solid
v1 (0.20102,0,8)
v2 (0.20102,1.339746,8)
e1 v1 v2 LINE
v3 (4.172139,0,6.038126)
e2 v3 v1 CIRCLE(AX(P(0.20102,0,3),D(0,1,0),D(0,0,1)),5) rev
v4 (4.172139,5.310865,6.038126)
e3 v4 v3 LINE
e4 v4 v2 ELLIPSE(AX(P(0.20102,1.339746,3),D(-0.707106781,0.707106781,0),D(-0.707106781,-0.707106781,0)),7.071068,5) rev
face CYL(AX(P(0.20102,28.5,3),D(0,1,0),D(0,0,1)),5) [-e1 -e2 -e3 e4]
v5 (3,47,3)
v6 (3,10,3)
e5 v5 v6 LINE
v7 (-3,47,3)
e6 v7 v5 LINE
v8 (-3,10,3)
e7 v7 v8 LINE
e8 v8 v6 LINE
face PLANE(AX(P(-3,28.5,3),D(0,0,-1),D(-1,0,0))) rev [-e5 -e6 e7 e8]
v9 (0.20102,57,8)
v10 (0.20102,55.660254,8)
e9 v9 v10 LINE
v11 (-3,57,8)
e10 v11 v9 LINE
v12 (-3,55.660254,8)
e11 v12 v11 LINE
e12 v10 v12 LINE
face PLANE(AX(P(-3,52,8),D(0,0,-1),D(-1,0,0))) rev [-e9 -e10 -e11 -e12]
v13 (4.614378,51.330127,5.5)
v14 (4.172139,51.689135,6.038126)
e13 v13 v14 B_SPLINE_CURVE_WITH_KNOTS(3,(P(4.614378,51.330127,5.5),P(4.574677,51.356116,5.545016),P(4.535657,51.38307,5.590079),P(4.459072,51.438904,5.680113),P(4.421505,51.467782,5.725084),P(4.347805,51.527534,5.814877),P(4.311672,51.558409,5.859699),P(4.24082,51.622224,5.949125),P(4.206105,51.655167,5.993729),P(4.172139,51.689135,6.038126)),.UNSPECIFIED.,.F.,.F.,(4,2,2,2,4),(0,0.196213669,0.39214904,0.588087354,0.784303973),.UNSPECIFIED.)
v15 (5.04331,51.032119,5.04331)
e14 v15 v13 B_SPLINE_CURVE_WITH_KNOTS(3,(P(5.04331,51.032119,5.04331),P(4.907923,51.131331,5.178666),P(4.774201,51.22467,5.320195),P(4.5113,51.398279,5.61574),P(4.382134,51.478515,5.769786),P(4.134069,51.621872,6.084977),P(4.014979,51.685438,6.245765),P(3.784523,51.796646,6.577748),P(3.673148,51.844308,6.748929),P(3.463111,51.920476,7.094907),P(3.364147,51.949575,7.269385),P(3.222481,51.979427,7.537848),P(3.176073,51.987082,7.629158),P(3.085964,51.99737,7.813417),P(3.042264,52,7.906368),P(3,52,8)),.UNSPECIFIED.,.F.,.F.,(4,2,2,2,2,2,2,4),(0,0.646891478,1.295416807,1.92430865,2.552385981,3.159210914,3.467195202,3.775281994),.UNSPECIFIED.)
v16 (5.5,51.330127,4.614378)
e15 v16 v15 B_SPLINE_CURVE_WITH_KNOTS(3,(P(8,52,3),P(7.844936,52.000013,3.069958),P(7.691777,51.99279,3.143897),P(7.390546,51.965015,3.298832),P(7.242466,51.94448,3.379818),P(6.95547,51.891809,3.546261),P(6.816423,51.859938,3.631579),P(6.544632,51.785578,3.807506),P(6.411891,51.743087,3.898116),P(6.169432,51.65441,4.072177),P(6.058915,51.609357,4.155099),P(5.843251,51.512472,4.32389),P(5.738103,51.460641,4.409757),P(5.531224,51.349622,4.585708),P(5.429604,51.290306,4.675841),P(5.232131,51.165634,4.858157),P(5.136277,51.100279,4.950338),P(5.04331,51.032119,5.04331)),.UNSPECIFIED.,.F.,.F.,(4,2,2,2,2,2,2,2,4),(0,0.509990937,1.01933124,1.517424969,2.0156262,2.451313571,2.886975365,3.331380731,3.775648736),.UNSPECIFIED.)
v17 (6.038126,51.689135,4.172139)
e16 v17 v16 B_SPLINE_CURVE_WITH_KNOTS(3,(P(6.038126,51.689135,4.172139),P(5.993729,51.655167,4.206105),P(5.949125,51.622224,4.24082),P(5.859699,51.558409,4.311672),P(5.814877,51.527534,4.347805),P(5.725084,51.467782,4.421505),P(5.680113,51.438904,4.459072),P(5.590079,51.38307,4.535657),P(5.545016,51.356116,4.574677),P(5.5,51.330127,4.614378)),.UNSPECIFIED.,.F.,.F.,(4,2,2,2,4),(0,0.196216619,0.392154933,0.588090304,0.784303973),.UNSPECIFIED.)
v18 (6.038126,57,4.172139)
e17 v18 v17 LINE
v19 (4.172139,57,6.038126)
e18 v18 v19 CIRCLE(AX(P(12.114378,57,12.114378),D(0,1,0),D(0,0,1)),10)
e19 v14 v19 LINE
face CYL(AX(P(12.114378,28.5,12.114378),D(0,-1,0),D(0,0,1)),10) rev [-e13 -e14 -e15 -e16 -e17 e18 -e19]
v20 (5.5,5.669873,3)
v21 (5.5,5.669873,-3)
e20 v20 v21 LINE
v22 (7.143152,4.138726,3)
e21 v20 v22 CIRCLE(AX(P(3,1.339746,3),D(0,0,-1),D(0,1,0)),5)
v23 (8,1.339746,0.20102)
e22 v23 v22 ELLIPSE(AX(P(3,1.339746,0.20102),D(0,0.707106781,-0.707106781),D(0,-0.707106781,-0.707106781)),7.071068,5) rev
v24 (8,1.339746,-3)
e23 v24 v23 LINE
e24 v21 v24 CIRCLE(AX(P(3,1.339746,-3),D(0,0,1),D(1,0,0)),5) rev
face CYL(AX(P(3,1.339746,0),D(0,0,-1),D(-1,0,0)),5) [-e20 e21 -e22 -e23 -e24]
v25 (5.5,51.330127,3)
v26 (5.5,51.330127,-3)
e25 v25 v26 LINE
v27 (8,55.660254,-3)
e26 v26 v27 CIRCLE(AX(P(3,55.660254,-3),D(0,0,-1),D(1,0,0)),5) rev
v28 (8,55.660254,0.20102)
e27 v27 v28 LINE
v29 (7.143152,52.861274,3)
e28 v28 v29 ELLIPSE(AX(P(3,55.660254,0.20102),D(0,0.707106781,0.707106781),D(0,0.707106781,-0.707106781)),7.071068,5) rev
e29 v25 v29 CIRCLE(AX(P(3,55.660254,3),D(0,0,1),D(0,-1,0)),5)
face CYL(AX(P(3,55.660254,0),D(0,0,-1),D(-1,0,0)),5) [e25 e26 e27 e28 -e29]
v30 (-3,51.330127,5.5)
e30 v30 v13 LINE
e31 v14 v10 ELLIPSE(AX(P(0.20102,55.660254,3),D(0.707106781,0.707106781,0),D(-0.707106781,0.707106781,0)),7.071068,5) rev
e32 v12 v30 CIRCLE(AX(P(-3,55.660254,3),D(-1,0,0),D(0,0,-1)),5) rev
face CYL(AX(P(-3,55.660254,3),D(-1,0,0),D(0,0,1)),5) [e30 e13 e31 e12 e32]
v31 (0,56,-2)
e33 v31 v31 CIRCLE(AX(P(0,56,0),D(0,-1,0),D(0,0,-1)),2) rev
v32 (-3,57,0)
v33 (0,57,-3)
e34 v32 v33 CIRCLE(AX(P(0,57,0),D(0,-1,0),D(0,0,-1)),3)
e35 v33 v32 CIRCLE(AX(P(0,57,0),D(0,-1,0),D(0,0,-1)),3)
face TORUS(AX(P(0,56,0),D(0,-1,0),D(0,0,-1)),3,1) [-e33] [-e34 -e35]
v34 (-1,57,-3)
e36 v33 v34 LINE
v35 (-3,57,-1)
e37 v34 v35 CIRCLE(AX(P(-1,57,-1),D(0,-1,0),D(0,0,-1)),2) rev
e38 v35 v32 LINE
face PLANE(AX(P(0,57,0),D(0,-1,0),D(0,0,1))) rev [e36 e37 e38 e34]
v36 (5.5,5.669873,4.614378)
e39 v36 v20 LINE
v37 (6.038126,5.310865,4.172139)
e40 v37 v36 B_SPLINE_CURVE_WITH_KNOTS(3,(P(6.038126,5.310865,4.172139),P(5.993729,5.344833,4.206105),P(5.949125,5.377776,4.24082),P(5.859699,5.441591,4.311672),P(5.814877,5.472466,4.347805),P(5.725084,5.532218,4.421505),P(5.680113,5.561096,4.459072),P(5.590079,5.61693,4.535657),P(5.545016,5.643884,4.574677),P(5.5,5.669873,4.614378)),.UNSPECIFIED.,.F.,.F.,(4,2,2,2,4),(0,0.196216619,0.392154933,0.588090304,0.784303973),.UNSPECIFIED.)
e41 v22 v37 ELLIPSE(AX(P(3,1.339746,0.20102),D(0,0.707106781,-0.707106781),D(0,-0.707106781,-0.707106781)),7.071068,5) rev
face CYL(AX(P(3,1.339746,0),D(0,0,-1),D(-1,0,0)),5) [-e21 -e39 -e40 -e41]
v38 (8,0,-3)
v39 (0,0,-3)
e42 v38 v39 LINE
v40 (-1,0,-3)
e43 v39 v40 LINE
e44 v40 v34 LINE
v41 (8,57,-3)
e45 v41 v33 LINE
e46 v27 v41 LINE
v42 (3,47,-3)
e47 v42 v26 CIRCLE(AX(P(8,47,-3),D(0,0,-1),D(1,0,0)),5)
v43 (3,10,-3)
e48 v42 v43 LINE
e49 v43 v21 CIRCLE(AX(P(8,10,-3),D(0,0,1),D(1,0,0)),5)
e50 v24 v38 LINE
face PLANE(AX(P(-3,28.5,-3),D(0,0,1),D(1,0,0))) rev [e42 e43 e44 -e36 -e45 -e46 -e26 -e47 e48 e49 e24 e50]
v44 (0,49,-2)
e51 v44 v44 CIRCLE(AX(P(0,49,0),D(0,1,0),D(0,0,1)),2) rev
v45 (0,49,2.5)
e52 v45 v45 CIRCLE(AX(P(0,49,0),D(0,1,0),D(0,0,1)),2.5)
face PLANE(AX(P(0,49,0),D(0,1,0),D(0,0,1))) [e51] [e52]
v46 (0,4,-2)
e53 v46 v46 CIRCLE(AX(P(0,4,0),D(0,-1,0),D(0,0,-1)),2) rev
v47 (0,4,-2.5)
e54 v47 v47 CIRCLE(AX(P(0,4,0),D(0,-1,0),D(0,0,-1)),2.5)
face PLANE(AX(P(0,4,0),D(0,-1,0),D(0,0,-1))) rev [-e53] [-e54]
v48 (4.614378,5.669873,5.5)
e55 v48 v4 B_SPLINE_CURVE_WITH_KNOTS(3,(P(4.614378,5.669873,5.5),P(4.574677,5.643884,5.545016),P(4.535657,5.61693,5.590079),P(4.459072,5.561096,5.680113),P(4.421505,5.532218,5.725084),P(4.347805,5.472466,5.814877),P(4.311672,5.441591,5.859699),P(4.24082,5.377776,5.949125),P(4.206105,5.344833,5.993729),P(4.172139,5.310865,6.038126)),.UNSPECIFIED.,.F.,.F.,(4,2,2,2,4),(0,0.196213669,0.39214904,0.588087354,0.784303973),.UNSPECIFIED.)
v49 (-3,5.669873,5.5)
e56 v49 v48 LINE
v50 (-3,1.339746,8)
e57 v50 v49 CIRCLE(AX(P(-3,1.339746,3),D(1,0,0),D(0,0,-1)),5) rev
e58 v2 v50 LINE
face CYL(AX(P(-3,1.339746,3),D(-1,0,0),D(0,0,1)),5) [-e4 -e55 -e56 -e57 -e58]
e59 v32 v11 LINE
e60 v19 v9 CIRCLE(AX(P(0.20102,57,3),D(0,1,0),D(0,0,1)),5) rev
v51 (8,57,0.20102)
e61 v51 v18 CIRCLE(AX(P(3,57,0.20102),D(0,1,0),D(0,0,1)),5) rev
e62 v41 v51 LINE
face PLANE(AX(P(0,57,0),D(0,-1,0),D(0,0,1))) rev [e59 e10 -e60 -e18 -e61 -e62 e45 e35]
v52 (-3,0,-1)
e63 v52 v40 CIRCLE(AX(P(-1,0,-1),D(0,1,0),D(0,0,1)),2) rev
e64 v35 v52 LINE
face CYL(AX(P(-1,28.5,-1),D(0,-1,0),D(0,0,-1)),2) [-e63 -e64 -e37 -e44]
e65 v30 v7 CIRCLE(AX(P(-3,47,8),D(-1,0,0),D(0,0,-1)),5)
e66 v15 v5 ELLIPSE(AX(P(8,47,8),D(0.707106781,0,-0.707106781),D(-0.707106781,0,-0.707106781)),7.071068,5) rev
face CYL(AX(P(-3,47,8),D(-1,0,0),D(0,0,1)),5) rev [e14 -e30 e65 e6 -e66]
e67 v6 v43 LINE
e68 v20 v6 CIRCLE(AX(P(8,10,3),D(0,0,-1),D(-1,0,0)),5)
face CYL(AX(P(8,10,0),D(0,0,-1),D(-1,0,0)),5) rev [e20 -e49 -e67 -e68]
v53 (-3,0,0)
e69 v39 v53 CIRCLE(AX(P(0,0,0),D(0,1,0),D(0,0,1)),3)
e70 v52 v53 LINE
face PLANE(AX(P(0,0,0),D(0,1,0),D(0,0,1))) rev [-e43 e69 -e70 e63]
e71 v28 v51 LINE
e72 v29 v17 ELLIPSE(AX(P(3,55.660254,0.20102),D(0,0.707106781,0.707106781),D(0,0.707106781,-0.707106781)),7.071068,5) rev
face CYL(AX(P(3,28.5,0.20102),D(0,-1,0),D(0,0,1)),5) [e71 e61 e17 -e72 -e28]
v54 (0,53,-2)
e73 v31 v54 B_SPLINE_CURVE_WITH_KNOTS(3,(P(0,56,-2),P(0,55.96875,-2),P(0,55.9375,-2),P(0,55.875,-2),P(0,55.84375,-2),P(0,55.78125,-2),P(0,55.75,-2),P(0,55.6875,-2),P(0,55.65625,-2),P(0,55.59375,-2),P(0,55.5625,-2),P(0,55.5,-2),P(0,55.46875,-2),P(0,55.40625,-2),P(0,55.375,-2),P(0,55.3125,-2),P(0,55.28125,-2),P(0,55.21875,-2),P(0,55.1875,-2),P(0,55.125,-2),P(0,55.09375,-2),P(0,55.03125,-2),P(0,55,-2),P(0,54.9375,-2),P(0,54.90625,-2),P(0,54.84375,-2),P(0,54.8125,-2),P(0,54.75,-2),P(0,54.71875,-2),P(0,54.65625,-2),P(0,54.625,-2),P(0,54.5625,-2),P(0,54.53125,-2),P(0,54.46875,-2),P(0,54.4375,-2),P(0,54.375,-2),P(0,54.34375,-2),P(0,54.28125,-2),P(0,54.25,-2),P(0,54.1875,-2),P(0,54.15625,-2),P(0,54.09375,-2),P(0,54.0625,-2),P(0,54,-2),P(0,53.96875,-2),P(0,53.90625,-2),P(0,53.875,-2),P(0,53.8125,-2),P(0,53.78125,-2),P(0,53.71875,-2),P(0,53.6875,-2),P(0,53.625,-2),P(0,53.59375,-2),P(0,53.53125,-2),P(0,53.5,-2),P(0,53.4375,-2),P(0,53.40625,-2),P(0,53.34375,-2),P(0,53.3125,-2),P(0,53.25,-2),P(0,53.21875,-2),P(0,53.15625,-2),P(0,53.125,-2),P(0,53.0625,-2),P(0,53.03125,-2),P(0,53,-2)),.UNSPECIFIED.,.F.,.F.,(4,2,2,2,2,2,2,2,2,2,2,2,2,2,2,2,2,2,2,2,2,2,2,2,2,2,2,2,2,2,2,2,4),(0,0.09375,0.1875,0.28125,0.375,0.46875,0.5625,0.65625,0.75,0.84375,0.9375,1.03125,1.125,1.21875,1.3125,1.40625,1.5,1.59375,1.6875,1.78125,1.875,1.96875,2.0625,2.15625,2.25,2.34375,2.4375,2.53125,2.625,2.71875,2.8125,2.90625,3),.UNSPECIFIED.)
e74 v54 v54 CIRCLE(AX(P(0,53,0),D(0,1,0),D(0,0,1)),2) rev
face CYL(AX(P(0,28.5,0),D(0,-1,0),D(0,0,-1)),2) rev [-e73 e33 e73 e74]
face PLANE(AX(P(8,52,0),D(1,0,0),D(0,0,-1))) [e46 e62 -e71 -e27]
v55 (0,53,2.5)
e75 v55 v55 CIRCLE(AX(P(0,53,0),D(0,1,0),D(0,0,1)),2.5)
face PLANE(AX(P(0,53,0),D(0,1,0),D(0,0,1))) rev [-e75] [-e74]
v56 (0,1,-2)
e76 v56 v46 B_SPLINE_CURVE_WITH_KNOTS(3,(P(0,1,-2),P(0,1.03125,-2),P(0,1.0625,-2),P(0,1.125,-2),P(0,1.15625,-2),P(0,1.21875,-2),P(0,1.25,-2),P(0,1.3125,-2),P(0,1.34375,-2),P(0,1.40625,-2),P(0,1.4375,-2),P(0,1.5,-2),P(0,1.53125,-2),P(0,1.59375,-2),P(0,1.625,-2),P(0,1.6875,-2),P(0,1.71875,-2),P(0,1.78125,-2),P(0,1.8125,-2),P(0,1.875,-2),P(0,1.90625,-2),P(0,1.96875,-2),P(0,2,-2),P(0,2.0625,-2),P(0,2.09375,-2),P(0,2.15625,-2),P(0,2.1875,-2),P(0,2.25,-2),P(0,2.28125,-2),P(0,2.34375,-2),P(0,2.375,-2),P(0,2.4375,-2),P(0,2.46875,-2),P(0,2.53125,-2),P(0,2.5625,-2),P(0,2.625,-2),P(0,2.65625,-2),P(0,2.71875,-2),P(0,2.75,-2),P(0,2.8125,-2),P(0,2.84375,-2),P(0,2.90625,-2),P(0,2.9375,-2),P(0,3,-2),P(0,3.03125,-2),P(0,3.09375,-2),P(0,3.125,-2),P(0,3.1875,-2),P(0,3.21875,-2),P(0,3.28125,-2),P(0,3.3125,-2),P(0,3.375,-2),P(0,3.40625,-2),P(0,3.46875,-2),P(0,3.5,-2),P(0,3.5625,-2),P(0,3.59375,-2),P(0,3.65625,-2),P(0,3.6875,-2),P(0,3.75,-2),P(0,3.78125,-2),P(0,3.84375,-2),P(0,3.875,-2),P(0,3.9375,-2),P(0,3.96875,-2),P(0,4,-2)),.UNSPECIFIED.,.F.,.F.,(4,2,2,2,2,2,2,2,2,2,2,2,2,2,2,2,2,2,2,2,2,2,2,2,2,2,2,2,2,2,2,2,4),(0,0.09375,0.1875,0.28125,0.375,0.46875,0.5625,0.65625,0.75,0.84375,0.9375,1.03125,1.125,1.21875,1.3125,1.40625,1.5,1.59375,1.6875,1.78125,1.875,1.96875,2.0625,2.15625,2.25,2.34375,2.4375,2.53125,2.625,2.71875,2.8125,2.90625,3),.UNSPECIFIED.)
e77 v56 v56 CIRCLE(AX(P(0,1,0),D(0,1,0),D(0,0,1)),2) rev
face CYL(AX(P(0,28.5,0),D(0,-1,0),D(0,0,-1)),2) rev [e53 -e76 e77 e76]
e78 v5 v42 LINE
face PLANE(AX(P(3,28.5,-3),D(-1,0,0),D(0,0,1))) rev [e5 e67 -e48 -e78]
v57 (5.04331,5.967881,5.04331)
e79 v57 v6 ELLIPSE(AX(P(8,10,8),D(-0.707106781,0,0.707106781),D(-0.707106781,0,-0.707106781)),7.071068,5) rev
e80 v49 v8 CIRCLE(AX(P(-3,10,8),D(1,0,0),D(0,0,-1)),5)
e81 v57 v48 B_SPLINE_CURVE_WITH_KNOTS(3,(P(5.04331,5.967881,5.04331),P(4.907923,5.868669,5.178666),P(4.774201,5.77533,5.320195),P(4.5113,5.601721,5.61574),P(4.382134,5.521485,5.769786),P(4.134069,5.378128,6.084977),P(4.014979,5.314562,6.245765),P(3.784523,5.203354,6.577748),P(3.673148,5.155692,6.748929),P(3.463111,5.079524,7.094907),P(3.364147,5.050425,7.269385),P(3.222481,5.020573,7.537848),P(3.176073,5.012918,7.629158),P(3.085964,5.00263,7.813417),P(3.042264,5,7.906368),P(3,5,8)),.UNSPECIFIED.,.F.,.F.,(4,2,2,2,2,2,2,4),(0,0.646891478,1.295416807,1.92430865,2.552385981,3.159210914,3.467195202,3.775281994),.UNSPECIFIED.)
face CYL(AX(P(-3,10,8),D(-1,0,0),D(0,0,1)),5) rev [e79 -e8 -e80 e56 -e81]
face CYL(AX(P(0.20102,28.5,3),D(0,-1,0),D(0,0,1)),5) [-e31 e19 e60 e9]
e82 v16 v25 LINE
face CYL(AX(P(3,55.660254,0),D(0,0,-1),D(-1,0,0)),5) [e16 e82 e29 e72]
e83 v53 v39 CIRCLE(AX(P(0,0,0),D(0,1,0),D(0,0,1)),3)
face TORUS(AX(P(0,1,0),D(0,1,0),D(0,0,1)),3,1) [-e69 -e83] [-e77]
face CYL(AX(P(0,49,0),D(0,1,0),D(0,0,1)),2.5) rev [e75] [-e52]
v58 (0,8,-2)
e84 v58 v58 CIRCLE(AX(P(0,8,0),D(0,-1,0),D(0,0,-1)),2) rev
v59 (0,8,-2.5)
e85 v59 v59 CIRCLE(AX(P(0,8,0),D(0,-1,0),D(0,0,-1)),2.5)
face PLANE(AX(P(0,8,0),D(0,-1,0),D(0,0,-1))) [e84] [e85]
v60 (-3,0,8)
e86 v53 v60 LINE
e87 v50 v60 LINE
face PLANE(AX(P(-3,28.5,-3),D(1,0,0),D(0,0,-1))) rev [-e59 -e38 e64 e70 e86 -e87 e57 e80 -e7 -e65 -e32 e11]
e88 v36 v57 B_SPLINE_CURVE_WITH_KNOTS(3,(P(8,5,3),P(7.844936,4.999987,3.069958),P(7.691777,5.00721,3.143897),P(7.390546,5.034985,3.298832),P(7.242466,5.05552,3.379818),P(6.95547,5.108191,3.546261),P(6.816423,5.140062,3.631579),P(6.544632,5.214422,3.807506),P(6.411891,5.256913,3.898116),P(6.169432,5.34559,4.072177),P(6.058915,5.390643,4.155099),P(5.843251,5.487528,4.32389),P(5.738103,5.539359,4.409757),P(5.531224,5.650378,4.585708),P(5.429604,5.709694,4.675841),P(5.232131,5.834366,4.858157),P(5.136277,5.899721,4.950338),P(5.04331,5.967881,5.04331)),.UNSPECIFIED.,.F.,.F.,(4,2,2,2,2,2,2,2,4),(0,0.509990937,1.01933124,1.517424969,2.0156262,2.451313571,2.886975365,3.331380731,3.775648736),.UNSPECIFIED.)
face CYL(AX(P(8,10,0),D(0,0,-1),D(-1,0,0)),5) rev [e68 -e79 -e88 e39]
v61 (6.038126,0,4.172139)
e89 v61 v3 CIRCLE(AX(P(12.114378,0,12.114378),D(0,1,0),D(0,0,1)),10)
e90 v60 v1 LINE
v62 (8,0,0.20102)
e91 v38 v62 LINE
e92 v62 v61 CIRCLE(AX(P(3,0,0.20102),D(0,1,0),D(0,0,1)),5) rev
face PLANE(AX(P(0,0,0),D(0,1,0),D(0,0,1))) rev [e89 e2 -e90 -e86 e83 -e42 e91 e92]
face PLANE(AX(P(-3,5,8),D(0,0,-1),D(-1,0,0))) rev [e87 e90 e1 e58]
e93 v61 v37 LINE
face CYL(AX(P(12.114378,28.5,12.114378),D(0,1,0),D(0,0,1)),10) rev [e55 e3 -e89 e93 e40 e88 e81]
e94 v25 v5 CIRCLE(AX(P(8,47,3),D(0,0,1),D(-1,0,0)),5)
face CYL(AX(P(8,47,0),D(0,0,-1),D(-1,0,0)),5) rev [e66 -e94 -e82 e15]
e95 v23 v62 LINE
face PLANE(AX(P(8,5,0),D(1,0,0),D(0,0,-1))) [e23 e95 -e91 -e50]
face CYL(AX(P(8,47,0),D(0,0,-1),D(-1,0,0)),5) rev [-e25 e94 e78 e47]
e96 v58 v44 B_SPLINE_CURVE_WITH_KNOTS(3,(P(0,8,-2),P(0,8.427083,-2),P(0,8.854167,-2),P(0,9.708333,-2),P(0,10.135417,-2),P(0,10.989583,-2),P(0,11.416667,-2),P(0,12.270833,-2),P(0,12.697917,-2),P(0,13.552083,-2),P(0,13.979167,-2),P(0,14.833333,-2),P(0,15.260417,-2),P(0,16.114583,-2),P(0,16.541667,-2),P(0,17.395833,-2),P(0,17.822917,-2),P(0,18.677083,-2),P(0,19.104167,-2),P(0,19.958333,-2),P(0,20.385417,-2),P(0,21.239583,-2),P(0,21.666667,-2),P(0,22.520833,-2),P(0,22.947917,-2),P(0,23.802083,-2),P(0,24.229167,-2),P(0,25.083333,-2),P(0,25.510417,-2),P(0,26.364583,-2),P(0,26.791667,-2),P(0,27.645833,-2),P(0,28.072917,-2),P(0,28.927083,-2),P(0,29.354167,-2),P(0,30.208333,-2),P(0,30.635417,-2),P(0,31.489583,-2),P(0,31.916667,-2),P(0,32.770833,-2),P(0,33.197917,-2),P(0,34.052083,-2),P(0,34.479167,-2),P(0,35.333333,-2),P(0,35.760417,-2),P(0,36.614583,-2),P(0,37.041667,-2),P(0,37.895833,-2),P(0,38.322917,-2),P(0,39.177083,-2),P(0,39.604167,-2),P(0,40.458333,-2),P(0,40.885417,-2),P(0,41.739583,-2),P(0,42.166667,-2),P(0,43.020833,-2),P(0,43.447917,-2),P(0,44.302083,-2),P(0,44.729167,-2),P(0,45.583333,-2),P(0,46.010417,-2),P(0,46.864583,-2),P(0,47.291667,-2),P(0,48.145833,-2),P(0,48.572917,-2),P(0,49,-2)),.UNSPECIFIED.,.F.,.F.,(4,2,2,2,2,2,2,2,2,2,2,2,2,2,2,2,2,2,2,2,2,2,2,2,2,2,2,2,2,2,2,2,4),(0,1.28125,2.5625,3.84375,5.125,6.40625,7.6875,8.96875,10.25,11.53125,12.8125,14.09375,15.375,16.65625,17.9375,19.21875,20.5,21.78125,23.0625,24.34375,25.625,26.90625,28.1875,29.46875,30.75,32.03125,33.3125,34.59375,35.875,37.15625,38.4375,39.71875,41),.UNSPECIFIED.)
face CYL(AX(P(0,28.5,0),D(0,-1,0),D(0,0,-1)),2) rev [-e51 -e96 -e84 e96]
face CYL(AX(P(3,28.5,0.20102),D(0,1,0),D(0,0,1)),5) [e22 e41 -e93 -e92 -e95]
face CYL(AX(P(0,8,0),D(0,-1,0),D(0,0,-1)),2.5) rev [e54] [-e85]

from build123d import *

# Parameters (mm, degrees)
BOSS_EXTRUDE1_DEPTH = 28.5
SKETCH3_R           = 2
CUT_EXTRUDE1_DEPTH  = 29.81405906844782
SKETCH4_W           = 5.000000000000001
SKETCH4_H           = 6
SKETCH4_W_2         = 6
SKETCH4_H_2         = 5
BOSS_EXTRUDE2_DEPTH = 5
FILLET1_R           = 10
FILLET3_R           = 5
FILLET4_R           = 5
FILLET5_R           = 2
CUT_EXTRUDE2_START  = -4
SKETCH5_R           = 2.5
CUT_EXTRUDE2_DEPTH  = 4
CUT_EXTRUDE3_START  = -8
SKETCH6_R           = 2.5
CUT_EXTRUDE3_DEPTH  = 4
FILLET6_R           = 1


# Some blends are built 0.0001 mm under size
with BuildPart() as part:
    # Sketch2 → Boss-Extrude1 (new body)
    with BuildSketch(Plane(origin=(0, 0, 0), x_dir=(1, 0, 0), z_dir=(0, 1, 0))):
        Polygon((-3.000000000000001, 3), (2.999999999999999, 3), (3, -3), (-3, -3), align=None)
    extrude(amount=BOSS_EXTRUDE1_DEPTH)

    # Sketch3 → Cut-Extrude1 (cut, through all)
    with BuildSketch(Plane.XZ):
        with Locations(Location((0, 0, 0), (0, 0, 270))):
            Circle(SKETCH3_R)
    extrude(amount=-CUT_EXTRUDE1_DEPTH, mode=Mode.SUBTRACT)

    # Sketch4 → Boss-Extrude2 (add)
    with BuildSketch(Plane.XZ):
        with Locations((5.5, 0)):
            Rectangle(SKETCH4_W, SKETCH4_H)
        with Locations((0, 5.5)):
            Rectangle(SKETCH4_W_2, SKETCH4_H_2)
    extrude(amount=-BOSS_EXTRUDE2_DEPTH)

    # Fillet1
    # the kernel refuses this fillet: 10 mm, written as the material it adds along each edge
    with BuildSketch(Plane(origin=(3, 0, 3), x_dir=(3.6e-16, 0, 1), z_dir=(0, 1, 0))) as fillet1_piece_1:
        with BuildLine():
            CenterArc((9.11437827766148, 9.114378277661475), FILLET1_R, 204.29518894536457, 41.4096221092708)
            Line((1.78e-15, 5), (0, 0))
            Line((0, 0), (5, 0))
        make_face()
    extrude(amount=5)

    # Fillet3
    # the kernel refuses this fillet: 5 mm, written as the material it adds along each edge
    with BuildSketch(Plane(origin=(3, 5, 3), x_dir=(0, 0, 1), z_dir=(-1, 0, 0))) as fillet3_piece_1:
        with BuildLine():
            CenterArc((FILLET3_R, FILLET3_R), FILLET3_R, 180, 90)
            Line((-8.9e-16, FILLET3_R), (0, 0))
            Line((0, 0), (FILLET3_R, 0))
        make_face()
    extrude(amount=6)
    with BuildSketch(Plane(origin=(2.999999999999999, 5, 3), x_dir=(1, 0, 0), z_dir=(0, 0, -1))) as fillet3_piece_2:
        with BuildLine():
            CenterArc((FILLET3_R, -FILLET3_R), FILLET3_R, 90, 90)
            Line((-8.9e-16, -FILLET3_R), (0, 0))
            Line((0, 0), (FILLET3_R, 0))
        make_face()
    extrude(amount=6)
    with BuildSketch(Plane(origin=(15.5, 5, 3), x_dir=(0, 0, 1), z_dir=(-1, 0, 0))) as fillet3_piece_3a_section:
        with BuildLine():
            CenterArc((FILLET3_R, FILLET3_R), FILLET3_R, 180, 90)
            Line((-8.9e-16, FILLET3_R), (0, 0))
            Line((0, 0), (FILLET3_R, 0))
        make_face()
    fillet3_piece_3a = extrude(amount=18.5, mode=Mode.PRIVATE)
    fillet3_piece_3a = fillet3_piece_3a - Plane(origin=(12.114378277661, 5, 12.114378277661), x_dir=(0, 0, 1), z_dir=(0, -1, 0)) * Cylinder(10, 57, mode=Mode.PRIVATE)
    fillet3_piece_3a = split(fillet3_piece_3a, bisect_by=Plane(origin=(8, 5, 3), z_dir=(-1, 0, 0)), keep=Keep.TOP, mode=Mode.PRIVATE)
    fillet3_piece_3a = split(fillet3_piece_3a, bisect_by=Plane(origin=(3, 5, 3.0000000000000018), z_dir=(1, 0, -1.5e-16)), keep=Keep.TOP, mode=Mode.PRIVATE)
    with BuildSketch(Plane(origin=(2.999999999999999, 5, 15.5), x_dir=(1, 0, 0), z_dir=(0, 0, -1))) as fillet3_piece_3b_section:
        with BuildLine():
            CenterArc((FILLET3_R, -FILLET3_R), FILLET3_R, 90, 90)
            Line((-8.9e-16, -FILLET3_R), (0, 0))
            Line((0, 0), (FILLET3_R, 0))
        make_face()
    fillet3_piece_3b = extrude(amount=18.5, mode=Mode.PRIVATE)
    fillet3_piece_3b = fillet3_piece_3b - Plane(origin=(12.114378277661, 5, 12.114378277661), x_dir=(0, 0, 1), z_dir=(0, -1, 0)) * Cylinder(10, 57, mode=Mode.PRIVATE)
    fillet3_piece_3b = split(fillet3_piece_3b, bisect_by=Plane(origin=(2.999999999999999, 5, 8), z_dir=(0, 0, -1)), keep=Keep.TOP, mode=Mode.PRIVATE)
    fillet3_piece_3b = split(fillet3_piece_3b, bisect_by=Plane(origin=(2.999999999999999, 5, 3), z_dir=(0, 0, 1)), keep=Keep.TOP, mode=Mode.PRIVATE)
    fillet3_piece_3 = fillet3_piece_3a & fillet3_piece_3b
    add(fillet3_piece_3)

    # Fillet4
    fillet4_edges = [part.edges().sort_by_distance(p)[0] for p in [
        (8, 2.5, 3),
        (8, 5, 0),
        (3, 2.5, 8),
        (0, 5, 8),
    ]]
    fillet(fillet4_edges, radius=FILLET4_R)

    # Mirror1: part across plane


with BuildPart() as part_1:
    add(part.part)
    add(part.part.mirror(Plane.ZX.offset(28.5)))

    # Fillet5
    fillet5_edges = [part_1.edges().sort_by_distance(p)[0] for p in [
        (-3.000000000000001, 28.5, -3),
    ]]
    fillet(fillet5_edges, radius=FILLET5_R)

    # Sketch5 → Cut-Extrude2 (cut)
    with BuildSketch(Plane.XZ.offset(CUT_EXTRUDE2_START)):
        with Locations(Location((0, 0, 0), (0, 0, 270))):
            Circle(SKETCH5_R)
    extrude(amount=-CUT_EXTRUDE2_DEPTH, mode=Mode.SUBTRACT)

    # Sketch6 → Cut-Extrude3 (cut)
    with BuildSketch(Plane(origin=(0, 57, 0), x_dir=(1, 0, 0), z_dir=(0, 1, 0)).offset(CUT_EXTRUDE3_START)):
        with Locations(Location((0, 0, 0), (0, 0, 90))):
            Circle(SKETCH6_R)
    extrude(amount=CUT_EXTRUDE3_DEPTH, mode=Mode.SUBTRACT)

    # Fillet6
    fillet6_edges = [part_1.edges().sort_by_distance(p)[0] for p in [
        (6.1e-16, 57, 2),
        (6.1e-16, 0, 2),
    ]]
    fillet(fillet6_edges, radius=FILLET6_R - 0.0001)  # a hair under: the kernel refuses the full size


solid = part_1.part
